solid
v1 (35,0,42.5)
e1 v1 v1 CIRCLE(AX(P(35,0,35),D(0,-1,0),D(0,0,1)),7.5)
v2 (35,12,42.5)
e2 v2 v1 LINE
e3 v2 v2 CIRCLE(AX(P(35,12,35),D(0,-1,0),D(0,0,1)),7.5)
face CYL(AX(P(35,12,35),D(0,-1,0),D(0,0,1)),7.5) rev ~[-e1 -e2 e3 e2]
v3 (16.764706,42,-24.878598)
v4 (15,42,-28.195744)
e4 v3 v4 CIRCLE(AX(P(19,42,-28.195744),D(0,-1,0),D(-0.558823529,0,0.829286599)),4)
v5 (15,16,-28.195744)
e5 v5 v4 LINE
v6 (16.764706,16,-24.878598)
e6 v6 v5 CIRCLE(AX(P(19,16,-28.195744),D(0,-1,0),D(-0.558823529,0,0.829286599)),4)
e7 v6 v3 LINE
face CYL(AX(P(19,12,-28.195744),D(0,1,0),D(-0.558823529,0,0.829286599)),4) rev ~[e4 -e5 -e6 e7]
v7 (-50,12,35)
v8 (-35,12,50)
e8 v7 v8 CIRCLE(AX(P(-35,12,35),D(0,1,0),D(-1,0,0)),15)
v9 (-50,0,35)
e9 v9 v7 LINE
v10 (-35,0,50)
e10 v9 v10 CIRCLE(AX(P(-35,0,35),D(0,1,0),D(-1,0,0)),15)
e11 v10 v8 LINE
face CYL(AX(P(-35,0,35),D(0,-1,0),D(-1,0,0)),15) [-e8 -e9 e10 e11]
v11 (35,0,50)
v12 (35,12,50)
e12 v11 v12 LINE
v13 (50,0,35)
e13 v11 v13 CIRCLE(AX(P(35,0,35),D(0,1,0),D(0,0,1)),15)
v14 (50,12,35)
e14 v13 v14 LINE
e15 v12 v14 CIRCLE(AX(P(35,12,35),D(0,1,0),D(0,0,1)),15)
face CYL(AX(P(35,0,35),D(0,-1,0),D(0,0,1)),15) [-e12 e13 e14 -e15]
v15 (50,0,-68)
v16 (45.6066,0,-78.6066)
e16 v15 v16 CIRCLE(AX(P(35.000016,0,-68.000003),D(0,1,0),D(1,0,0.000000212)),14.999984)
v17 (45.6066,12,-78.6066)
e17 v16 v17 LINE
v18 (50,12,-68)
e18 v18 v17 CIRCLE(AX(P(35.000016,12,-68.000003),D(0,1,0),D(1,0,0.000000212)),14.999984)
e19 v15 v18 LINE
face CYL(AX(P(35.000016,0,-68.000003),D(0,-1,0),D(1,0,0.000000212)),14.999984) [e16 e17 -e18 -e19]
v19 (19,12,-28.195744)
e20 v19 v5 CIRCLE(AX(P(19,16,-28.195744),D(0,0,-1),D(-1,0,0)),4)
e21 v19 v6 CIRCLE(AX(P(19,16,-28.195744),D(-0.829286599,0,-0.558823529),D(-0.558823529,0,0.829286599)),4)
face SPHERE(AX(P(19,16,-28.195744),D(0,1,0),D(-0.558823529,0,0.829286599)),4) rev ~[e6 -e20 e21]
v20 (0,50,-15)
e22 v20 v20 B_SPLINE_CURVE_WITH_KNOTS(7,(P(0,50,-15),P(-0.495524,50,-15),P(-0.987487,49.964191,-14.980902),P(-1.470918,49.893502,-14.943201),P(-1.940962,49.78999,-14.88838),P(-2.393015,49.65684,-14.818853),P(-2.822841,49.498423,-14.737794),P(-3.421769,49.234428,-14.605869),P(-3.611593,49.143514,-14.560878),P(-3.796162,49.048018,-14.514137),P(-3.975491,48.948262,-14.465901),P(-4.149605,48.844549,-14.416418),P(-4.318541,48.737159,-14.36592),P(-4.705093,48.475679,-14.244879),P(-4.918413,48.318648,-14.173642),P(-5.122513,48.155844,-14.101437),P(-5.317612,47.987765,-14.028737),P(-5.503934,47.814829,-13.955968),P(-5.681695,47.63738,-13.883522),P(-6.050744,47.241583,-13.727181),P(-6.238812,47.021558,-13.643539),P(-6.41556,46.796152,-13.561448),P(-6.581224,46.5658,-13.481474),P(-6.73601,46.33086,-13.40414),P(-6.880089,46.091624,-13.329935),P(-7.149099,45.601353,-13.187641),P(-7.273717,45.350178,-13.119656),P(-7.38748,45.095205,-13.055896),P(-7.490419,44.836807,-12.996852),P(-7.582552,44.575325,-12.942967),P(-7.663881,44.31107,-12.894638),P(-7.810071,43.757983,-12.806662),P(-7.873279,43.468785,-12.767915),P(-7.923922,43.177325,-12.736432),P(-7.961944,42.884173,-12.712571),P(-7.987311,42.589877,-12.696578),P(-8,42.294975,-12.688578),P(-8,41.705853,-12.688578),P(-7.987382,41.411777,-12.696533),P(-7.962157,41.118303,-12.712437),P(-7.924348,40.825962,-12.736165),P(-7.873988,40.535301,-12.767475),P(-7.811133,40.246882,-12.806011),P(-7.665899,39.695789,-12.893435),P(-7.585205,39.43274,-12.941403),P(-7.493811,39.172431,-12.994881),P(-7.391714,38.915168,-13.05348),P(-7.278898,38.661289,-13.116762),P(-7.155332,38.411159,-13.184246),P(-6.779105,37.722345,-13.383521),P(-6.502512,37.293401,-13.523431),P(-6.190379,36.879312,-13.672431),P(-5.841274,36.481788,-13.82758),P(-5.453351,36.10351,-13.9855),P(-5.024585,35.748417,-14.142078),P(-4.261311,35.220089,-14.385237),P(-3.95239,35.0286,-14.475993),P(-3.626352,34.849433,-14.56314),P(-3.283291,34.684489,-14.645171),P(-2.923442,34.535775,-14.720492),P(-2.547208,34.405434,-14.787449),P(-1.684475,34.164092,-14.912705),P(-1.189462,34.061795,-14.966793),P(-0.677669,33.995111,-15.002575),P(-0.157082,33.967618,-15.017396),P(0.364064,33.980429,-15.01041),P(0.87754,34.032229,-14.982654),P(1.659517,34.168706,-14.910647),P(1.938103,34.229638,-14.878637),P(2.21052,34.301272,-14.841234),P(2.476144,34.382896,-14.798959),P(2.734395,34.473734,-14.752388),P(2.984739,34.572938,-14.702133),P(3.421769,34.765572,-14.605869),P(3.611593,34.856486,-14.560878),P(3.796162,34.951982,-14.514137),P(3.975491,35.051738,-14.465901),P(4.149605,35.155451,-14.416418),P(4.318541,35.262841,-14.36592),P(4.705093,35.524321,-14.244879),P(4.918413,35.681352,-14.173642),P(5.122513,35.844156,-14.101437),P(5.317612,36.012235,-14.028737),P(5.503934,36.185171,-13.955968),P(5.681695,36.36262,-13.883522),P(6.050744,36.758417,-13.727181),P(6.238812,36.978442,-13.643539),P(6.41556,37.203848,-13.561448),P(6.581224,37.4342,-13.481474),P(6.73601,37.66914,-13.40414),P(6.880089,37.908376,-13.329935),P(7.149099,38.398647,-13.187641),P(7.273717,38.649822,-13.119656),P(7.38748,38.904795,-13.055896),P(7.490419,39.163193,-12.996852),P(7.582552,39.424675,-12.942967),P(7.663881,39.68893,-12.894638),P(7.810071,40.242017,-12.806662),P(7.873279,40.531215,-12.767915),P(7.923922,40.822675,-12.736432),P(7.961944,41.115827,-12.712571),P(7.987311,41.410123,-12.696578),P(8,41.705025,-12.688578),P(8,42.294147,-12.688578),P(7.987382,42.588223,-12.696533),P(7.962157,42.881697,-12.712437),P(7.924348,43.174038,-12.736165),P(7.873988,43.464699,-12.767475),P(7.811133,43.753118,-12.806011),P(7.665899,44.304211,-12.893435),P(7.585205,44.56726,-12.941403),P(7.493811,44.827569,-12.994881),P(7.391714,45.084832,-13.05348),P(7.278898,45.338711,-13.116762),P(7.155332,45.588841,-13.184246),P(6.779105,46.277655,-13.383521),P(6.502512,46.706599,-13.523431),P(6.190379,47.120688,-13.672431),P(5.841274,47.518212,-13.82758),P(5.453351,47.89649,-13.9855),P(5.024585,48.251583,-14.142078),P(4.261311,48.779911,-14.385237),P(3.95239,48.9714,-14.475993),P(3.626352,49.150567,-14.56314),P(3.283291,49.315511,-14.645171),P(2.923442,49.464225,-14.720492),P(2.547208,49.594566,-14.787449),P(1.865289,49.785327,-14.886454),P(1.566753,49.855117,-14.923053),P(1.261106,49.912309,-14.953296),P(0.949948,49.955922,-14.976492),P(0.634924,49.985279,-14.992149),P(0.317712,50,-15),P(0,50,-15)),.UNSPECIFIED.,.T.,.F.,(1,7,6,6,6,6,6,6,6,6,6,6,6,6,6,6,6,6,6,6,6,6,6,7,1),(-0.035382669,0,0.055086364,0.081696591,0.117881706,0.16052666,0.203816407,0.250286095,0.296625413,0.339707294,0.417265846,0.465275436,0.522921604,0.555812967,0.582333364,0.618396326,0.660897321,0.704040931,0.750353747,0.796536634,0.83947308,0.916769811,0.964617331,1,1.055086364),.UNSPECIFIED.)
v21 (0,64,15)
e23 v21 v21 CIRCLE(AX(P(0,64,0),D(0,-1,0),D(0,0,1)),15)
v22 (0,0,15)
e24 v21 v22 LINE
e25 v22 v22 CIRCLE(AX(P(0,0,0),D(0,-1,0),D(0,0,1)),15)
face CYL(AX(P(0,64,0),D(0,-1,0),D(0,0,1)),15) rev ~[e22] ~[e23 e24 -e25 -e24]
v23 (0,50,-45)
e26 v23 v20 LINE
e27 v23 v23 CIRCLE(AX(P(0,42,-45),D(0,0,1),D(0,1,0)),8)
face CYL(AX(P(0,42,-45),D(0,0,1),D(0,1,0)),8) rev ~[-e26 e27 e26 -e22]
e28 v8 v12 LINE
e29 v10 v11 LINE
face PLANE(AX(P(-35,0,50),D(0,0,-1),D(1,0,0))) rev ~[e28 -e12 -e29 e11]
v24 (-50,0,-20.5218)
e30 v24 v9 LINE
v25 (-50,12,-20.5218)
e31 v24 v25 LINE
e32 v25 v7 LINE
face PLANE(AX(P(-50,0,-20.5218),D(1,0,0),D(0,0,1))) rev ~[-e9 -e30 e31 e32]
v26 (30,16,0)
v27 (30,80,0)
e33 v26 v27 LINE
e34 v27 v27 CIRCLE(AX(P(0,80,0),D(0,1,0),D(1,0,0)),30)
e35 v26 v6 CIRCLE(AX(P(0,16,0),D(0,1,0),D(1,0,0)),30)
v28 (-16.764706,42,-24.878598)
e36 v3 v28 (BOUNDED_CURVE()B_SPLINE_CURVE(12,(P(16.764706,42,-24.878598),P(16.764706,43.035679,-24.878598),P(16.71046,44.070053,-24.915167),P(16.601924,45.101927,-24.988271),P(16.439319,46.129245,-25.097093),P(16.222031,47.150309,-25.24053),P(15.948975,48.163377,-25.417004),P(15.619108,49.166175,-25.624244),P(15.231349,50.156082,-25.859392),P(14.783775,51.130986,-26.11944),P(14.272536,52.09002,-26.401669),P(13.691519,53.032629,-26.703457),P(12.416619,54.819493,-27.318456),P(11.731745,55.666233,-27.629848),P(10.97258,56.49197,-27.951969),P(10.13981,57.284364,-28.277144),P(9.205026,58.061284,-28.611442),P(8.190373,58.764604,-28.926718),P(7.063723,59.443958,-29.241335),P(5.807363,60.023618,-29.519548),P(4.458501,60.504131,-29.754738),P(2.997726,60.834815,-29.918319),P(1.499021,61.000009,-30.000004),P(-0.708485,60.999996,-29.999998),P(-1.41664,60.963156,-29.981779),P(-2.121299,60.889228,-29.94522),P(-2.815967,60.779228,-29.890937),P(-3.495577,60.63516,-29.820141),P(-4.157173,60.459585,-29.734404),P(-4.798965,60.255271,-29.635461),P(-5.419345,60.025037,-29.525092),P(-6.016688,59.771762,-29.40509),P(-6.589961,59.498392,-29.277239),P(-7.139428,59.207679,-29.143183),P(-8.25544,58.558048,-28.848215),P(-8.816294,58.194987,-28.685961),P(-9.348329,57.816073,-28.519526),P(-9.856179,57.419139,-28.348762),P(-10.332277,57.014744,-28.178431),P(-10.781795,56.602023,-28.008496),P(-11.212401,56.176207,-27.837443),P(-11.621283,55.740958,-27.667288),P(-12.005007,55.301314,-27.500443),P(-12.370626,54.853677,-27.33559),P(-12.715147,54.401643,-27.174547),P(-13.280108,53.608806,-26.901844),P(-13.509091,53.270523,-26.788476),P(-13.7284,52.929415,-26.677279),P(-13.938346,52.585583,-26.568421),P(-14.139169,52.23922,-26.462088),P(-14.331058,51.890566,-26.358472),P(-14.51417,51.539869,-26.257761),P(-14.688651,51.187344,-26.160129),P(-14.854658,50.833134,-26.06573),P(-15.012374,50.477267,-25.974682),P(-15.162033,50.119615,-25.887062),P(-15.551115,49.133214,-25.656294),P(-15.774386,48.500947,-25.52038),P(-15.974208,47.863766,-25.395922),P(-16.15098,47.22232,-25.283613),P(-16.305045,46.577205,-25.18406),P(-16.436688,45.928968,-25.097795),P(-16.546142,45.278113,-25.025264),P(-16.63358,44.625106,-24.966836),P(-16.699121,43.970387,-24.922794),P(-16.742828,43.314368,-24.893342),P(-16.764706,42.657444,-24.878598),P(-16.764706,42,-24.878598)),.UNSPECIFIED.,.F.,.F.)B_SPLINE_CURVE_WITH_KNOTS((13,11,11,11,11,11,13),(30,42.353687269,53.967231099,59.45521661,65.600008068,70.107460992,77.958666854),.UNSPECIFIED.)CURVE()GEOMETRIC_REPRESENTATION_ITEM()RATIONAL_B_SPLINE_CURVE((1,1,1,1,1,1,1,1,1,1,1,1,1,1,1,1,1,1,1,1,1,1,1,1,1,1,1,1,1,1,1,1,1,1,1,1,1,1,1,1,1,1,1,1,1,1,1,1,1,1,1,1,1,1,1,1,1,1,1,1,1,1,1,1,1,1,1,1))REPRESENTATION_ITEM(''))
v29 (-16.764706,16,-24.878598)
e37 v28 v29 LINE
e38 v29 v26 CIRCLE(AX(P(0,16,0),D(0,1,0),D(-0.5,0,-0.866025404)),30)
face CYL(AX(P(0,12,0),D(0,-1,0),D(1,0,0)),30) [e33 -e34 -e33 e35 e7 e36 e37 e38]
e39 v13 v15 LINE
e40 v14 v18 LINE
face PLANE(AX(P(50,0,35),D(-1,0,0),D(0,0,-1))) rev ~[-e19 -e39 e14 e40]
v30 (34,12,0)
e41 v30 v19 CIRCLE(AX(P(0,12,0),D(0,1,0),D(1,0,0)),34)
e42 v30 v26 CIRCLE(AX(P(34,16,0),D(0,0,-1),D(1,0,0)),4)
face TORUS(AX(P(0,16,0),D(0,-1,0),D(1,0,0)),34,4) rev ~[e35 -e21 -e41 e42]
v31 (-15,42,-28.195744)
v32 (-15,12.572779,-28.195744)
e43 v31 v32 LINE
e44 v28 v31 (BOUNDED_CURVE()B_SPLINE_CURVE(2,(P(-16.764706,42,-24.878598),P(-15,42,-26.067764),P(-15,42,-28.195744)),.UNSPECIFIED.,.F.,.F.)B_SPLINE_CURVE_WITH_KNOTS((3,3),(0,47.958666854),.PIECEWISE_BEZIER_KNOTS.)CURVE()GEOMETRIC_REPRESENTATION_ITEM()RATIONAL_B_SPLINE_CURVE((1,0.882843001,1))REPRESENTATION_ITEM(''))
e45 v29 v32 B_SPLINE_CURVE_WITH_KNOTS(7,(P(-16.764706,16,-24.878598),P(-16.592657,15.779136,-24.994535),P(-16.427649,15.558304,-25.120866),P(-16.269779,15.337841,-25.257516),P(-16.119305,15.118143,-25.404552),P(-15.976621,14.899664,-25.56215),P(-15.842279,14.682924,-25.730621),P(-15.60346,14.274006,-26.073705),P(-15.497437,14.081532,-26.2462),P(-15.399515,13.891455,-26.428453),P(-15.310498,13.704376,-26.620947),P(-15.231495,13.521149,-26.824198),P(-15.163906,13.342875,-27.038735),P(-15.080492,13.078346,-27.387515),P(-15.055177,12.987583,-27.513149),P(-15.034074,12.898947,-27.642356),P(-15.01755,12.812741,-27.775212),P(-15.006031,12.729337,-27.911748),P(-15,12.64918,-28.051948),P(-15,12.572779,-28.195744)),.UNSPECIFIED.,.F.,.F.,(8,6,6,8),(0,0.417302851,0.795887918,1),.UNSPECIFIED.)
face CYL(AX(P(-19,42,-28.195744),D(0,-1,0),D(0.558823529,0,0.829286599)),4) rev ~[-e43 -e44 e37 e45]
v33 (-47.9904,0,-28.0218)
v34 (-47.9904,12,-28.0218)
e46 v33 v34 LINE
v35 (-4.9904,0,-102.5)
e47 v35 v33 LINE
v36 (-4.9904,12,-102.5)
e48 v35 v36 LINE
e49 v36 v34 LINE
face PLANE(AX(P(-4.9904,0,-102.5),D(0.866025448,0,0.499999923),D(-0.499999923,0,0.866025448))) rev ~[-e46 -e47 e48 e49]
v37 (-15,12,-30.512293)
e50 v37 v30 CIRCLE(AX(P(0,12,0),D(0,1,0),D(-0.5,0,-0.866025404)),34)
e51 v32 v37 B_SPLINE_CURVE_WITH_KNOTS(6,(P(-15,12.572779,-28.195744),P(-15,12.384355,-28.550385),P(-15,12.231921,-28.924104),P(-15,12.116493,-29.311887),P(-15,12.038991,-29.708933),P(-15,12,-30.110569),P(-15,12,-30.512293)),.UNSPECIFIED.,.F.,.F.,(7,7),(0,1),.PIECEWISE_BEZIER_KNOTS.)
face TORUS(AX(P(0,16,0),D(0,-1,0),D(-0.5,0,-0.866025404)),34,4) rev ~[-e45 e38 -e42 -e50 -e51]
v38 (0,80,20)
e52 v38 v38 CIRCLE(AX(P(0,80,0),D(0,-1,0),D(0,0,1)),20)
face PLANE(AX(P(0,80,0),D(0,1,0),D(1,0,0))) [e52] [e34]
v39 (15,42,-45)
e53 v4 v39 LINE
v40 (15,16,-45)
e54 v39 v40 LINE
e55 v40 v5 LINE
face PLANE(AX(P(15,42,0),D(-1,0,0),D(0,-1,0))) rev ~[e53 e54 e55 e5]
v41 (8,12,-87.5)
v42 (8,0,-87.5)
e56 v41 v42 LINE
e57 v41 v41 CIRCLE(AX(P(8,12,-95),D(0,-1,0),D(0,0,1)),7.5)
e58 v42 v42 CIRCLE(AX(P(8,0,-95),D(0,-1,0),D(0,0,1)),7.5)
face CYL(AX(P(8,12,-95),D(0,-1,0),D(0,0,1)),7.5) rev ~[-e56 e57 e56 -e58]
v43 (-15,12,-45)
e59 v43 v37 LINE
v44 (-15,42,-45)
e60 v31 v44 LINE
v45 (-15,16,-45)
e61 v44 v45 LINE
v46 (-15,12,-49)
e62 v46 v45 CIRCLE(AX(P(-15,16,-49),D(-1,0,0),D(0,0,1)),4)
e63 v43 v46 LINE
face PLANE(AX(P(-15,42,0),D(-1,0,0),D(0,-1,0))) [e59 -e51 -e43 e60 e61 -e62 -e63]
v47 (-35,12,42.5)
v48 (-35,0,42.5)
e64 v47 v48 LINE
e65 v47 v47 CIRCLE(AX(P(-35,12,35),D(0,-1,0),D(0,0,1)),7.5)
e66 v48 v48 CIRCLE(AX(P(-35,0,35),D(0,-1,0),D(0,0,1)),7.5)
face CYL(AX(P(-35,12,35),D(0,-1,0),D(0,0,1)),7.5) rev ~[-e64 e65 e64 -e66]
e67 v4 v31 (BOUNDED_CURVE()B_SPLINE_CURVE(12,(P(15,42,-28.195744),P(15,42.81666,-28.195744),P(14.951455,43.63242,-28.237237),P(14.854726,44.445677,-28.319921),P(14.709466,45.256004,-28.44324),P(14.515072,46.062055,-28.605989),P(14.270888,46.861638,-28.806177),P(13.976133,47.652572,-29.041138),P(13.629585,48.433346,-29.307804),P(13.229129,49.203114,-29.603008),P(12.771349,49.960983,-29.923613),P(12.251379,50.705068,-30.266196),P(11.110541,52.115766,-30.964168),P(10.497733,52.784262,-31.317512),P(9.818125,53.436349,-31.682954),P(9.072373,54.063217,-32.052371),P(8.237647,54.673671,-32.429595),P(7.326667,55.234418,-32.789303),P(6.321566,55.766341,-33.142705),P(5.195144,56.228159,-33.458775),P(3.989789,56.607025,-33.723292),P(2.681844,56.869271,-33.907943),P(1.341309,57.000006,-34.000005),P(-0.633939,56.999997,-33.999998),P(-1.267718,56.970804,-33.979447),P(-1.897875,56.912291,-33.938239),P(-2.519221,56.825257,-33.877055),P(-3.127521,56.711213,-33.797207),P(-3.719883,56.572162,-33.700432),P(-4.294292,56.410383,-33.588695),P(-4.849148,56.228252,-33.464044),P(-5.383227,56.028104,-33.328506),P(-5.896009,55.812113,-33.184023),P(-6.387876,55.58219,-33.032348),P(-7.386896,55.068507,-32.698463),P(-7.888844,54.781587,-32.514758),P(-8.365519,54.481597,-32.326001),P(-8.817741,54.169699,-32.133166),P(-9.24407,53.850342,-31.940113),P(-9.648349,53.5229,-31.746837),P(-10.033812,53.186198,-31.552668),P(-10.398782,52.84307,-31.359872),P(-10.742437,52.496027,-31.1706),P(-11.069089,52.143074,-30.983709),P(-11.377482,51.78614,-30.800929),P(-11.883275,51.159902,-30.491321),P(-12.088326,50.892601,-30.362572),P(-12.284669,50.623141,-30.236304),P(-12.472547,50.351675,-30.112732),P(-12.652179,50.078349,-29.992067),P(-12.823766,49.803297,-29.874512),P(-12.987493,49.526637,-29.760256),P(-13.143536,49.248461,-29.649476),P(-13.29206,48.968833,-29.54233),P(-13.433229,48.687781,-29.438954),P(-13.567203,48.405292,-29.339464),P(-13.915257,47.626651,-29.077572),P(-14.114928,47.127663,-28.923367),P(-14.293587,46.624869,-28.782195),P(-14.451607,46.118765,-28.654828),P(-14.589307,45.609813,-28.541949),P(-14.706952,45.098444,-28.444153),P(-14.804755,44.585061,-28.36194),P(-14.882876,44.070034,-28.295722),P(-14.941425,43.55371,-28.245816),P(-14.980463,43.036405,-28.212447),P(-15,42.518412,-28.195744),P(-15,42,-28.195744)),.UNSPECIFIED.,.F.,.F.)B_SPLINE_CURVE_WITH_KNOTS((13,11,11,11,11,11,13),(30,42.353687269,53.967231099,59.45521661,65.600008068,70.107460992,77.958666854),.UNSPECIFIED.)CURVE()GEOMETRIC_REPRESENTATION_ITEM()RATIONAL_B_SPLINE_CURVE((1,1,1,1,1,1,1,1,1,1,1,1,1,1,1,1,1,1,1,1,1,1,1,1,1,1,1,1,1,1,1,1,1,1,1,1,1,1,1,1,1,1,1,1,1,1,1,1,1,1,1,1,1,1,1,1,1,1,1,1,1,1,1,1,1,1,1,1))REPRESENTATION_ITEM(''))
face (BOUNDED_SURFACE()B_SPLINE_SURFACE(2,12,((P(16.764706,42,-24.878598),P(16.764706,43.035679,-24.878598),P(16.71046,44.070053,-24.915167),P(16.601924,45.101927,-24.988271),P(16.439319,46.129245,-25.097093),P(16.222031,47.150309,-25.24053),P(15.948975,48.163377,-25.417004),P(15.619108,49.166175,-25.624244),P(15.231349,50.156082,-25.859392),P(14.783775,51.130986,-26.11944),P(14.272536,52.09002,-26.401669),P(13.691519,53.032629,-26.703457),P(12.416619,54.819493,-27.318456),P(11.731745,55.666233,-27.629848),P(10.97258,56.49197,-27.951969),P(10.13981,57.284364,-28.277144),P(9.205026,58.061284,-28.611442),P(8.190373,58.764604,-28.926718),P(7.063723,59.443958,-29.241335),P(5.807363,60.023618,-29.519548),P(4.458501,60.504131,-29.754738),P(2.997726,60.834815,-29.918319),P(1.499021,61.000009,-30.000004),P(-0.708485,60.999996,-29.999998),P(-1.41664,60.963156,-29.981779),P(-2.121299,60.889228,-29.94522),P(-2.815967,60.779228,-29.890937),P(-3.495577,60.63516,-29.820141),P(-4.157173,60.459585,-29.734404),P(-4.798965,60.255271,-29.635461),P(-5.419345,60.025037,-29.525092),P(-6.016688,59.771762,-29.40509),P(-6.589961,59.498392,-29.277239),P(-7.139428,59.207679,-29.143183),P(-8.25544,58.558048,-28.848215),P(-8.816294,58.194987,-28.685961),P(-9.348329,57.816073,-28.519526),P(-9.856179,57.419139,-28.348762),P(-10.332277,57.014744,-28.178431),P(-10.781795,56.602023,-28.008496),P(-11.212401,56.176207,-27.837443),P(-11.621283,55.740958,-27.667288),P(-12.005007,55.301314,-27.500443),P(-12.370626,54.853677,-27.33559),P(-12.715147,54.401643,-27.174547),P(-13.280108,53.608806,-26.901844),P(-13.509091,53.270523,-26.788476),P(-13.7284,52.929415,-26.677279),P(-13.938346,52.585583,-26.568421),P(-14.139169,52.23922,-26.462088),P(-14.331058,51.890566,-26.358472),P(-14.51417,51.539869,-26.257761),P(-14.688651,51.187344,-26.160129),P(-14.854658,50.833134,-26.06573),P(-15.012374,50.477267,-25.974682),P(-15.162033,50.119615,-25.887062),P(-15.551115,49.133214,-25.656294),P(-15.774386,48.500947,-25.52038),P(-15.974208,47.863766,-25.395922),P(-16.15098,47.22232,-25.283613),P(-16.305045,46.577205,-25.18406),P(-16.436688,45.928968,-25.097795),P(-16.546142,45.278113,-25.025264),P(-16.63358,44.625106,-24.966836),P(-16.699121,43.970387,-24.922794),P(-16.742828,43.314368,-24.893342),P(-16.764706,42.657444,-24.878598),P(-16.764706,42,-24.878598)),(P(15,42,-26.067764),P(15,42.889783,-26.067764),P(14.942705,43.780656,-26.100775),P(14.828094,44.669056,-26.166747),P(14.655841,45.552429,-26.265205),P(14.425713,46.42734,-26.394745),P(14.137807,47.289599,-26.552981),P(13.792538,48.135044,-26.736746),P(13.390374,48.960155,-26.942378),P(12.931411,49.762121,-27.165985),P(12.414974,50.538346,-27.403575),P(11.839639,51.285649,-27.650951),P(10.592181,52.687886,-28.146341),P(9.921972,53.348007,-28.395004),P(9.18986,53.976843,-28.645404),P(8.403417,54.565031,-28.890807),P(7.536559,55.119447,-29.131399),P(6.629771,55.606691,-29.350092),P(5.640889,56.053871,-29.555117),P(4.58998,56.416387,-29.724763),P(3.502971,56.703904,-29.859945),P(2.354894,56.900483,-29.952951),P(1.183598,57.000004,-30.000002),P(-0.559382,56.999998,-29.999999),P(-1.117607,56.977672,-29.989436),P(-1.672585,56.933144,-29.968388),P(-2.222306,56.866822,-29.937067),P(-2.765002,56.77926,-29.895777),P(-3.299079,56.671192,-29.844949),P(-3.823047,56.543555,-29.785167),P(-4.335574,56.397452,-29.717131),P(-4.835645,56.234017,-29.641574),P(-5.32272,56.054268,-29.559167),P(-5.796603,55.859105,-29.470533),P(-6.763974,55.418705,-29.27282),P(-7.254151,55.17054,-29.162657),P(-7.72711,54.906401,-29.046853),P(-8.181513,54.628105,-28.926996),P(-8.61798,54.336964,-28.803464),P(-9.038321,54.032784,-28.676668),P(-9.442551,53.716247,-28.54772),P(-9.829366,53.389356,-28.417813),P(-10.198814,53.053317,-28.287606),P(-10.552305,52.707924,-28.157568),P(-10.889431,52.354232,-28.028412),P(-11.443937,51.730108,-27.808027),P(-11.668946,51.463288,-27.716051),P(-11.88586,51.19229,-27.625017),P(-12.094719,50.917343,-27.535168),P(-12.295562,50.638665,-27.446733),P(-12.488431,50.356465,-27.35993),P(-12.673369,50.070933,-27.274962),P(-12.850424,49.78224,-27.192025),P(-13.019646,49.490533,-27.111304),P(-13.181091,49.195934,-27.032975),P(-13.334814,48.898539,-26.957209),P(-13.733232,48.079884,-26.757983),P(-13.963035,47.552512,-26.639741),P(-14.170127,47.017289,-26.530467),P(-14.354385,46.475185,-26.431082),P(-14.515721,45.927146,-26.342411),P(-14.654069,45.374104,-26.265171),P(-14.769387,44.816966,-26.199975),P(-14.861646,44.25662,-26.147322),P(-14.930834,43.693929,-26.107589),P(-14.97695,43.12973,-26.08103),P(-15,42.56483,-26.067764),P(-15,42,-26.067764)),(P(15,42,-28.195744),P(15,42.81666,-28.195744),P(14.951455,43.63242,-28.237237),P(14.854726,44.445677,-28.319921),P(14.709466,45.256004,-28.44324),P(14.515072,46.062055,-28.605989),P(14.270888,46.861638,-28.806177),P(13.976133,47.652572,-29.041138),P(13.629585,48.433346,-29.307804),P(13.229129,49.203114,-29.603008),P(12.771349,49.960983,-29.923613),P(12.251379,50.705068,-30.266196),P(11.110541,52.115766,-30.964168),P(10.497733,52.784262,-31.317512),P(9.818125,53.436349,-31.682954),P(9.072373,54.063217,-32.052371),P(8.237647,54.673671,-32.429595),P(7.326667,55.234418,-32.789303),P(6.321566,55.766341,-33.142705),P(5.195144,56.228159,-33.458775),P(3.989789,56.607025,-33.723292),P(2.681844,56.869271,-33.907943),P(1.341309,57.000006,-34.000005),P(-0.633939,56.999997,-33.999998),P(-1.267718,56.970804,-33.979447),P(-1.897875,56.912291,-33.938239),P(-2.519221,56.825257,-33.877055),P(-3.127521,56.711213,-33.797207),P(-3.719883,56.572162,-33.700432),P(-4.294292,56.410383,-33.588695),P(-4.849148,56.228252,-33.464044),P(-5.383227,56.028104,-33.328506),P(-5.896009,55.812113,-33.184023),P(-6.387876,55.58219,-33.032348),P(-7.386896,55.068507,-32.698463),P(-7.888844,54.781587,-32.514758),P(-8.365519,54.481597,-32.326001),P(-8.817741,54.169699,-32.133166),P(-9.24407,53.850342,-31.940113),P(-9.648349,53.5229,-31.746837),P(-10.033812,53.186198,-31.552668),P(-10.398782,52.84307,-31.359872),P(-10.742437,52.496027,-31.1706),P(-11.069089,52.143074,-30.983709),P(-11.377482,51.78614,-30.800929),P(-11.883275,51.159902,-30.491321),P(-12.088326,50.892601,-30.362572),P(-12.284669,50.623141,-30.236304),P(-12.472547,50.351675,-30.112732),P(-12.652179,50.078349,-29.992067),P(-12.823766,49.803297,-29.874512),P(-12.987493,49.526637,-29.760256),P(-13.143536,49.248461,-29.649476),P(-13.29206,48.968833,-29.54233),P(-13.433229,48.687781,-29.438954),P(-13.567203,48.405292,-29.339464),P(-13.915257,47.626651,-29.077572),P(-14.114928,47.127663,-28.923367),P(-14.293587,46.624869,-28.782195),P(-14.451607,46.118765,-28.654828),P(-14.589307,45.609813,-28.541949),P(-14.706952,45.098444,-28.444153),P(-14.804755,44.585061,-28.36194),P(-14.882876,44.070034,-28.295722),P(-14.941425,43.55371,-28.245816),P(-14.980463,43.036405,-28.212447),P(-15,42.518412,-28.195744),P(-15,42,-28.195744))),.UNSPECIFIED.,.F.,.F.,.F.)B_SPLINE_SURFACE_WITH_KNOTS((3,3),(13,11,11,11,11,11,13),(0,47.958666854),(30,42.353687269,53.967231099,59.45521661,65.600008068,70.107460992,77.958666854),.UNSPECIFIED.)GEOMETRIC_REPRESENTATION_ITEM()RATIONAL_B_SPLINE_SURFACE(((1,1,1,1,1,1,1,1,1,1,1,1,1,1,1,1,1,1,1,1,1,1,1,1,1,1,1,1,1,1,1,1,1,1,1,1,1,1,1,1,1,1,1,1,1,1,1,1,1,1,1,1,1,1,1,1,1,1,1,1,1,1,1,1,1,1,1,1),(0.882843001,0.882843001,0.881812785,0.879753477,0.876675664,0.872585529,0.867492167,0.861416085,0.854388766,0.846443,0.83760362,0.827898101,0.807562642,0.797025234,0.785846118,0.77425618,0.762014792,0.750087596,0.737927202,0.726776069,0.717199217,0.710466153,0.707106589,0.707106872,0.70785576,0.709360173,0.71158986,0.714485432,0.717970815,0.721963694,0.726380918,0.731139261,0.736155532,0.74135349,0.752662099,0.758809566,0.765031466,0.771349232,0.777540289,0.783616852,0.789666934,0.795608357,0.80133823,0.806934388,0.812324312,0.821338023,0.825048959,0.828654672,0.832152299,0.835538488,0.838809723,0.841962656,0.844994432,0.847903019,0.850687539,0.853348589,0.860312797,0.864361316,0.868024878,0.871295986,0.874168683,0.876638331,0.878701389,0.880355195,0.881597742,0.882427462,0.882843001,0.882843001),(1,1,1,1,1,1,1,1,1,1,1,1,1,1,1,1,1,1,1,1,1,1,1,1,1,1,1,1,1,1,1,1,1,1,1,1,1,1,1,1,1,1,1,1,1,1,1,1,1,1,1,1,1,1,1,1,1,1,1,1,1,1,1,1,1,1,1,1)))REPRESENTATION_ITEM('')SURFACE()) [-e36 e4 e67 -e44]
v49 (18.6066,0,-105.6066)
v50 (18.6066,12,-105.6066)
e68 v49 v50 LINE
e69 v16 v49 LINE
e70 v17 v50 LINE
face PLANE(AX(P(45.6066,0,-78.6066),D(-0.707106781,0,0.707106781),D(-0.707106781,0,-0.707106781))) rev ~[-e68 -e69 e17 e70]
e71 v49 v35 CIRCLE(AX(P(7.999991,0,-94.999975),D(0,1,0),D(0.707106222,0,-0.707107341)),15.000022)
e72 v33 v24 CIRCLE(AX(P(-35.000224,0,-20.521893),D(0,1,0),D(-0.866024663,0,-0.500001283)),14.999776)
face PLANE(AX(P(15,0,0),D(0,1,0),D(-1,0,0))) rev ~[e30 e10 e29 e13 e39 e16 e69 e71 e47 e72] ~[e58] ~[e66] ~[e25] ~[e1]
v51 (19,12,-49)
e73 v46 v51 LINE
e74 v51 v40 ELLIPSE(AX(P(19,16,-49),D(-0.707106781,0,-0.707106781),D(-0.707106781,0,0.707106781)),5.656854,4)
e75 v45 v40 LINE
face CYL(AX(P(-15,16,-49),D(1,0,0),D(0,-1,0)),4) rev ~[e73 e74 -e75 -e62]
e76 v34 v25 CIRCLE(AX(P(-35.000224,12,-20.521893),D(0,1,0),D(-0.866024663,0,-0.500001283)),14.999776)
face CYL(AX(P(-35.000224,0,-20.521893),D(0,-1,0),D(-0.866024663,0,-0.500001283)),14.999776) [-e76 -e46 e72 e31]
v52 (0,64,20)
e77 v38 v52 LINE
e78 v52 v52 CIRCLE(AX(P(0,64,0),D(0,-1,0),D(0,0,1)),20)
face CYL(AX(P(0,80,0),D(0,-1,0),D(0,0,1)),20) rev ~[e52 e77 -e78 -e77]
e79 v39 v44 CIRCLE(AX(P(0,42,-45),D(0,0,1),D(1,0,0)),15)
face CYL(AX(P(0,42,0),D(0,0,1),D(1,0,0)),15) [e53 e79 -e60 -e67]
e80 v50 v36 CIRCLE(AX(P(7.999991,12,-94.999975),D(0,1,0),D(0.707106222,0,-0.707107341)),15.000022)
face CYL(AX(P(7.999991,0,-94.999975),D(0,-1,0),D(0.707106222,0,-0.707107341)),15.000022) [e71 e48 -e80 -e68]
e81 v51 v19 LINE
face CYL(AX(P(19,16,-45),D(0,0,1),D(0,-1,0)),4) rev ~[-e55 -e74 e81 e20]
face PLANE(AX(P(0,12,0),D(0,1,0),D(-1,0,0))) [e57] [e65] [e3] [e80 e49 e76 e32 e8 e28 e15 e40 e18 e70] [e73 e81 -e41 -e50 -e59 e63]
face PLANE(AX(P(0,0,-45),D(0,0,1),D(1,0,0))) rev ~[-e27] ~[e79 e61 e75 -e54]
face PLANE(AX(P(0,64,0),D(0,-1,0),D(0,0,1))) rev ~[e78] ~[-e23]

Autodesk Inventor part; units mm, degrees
ref_plane "YZ Plane" through (0, 0, 0) normal (1, 0, 0) x (0, 1, 0)
ref_plane "XZ Plane" through (0, 0, 0) normal (0, 1, 0) x (-1, 0, 0)
ref_plane "XY Plane" through (0, 0, 0) normal (0, 0, 1) x (1, 0, 0)
sketch "Sketch1" plane through (0, 0, 0) normal (0, 1, 0) x (-1, 0, 0)
  line L0 (35, 50) -> (-35, 50)
  line L1 (-50, 35) -> (-50, -68)
  line L2 (-45.6066, -78.6066) -> (-18.6066, -105.6066)
  line L3 (4.9904, -102.5) -> (47.9904, -28.0218)
  line L4 (50, -20.5218) -> (50, 35)
  line L5 (0, -144.3313) -> (0, 86.0129) construction
  arc A0 (-18.6066, -105.6066) -> (4.9904, -102.5) centre (-8, -95) ccw
  arc A1 (47.9904, -28.0218) -> (50, -20.5218) centre (35, -20.5218) ccw
  arc A2 (50, 35) -> (35, 50) centre (35, 35) ccw
  arc A3 (-35, 50) -> (-50, 35) centre (-35, 35) ccw
  arc A4 (-50, -68) -> (-45.6066, -78.6066) centre (-35, -68) ccw
  point P0 (0, 0)
  point P1 (50, 50)
  point P2 (-50, 50)
  point P3 (0, 50)
  dimension "d0" = 100
  dimension "d1" = 50
  dimension "d2" = 135
  dimension "d3" = 15
  dimension "d4" = 42
  dimension "d5" = 145
  dimension "d6" = 30
  dimension "d7" = 15
extrude "Extrusion1" add sketch "Sketch1" along normal blind 12
sketch "Sketch2" plane through (0, 12, 0) normal (0, 1, 0) x (1, 0, 0)
  arc A0 (35, -50) -> (50, -35) centre (35, -35) ccw projected
  arc A1 (-50, -35) -> (-35, -50) centre (-35, -35) ccw projected
  arc A2 (18.6066, 105.6066) -> (-4.9904, 102.5) centre (8, 95) ccw projected
  point P0 (0, 0)
hole "Hole1" at (35, 12, 35) at (-35, 12, 35) at (8, 12, -95) direction (0, -1, 0) diameter 15 end through all
sketch "Sketch3" plane through (0, 12, 0) normal (0, 1, 0) x (1, 0, 0)
  circle A0 centre (0, 0) radius 30
  dimension "d17" = 60
extrude "Extrusion2" add sketch "Sketch3" along normal blind 68
sketch "Sketch5" plane through (0, 0, 0) normal (0, 0, 1) x (1, 0, 0)
  arc A0 (15, 42) -> (-15, 42) centre (0, 42) ccw
  line L0 (15, 42) -> (15, 0)
  line L1 (-15, 42) -> (-15, 0)
  line L2 (15, 0) -> (-15, 0)
  line L3 (-70, 0) -> (70, 0) construction
  point P0 (0, 0)
  dimension "d39" = 30
  dimension "d41" = 42
extrude "Extrusion4" add sketch "Sketch5" against normal blind 45
sketch "Sketch6" plane through (0, 80, 0) normal (0, 1, 0) x (1, 0, 0)
  circle A0 centre (0, 0) radius 30 projected
hole "Hole3" at (0, 80, 0) direction (0, -1, 0) diameter 30 end through all counterbore diameter 40 counterbore depth 16
sketch "Sketch7" plane through (0, 0, -45) normal (0, 0, -1) x (-1, 0, 0)
  arc A0 (15, 42) -> (-15, 42) centre (0, 42) ccw projected
  point P0 (0, 0)
hole "Hole4" at (0, 42, -45) direction (0, 0, 1) diameter 16 end up to surface
fillet "Fillet1" radius 4 7 edges at (25.9808, 12, -15) (-15, 12, 25.9808) (15, 12, -35.4904) (-15, 27, -25.9808) (15, 27, -25.9808) (-0.0148, 57, -30) (0, 12, -45)
properties material "Steel, Carbon"
